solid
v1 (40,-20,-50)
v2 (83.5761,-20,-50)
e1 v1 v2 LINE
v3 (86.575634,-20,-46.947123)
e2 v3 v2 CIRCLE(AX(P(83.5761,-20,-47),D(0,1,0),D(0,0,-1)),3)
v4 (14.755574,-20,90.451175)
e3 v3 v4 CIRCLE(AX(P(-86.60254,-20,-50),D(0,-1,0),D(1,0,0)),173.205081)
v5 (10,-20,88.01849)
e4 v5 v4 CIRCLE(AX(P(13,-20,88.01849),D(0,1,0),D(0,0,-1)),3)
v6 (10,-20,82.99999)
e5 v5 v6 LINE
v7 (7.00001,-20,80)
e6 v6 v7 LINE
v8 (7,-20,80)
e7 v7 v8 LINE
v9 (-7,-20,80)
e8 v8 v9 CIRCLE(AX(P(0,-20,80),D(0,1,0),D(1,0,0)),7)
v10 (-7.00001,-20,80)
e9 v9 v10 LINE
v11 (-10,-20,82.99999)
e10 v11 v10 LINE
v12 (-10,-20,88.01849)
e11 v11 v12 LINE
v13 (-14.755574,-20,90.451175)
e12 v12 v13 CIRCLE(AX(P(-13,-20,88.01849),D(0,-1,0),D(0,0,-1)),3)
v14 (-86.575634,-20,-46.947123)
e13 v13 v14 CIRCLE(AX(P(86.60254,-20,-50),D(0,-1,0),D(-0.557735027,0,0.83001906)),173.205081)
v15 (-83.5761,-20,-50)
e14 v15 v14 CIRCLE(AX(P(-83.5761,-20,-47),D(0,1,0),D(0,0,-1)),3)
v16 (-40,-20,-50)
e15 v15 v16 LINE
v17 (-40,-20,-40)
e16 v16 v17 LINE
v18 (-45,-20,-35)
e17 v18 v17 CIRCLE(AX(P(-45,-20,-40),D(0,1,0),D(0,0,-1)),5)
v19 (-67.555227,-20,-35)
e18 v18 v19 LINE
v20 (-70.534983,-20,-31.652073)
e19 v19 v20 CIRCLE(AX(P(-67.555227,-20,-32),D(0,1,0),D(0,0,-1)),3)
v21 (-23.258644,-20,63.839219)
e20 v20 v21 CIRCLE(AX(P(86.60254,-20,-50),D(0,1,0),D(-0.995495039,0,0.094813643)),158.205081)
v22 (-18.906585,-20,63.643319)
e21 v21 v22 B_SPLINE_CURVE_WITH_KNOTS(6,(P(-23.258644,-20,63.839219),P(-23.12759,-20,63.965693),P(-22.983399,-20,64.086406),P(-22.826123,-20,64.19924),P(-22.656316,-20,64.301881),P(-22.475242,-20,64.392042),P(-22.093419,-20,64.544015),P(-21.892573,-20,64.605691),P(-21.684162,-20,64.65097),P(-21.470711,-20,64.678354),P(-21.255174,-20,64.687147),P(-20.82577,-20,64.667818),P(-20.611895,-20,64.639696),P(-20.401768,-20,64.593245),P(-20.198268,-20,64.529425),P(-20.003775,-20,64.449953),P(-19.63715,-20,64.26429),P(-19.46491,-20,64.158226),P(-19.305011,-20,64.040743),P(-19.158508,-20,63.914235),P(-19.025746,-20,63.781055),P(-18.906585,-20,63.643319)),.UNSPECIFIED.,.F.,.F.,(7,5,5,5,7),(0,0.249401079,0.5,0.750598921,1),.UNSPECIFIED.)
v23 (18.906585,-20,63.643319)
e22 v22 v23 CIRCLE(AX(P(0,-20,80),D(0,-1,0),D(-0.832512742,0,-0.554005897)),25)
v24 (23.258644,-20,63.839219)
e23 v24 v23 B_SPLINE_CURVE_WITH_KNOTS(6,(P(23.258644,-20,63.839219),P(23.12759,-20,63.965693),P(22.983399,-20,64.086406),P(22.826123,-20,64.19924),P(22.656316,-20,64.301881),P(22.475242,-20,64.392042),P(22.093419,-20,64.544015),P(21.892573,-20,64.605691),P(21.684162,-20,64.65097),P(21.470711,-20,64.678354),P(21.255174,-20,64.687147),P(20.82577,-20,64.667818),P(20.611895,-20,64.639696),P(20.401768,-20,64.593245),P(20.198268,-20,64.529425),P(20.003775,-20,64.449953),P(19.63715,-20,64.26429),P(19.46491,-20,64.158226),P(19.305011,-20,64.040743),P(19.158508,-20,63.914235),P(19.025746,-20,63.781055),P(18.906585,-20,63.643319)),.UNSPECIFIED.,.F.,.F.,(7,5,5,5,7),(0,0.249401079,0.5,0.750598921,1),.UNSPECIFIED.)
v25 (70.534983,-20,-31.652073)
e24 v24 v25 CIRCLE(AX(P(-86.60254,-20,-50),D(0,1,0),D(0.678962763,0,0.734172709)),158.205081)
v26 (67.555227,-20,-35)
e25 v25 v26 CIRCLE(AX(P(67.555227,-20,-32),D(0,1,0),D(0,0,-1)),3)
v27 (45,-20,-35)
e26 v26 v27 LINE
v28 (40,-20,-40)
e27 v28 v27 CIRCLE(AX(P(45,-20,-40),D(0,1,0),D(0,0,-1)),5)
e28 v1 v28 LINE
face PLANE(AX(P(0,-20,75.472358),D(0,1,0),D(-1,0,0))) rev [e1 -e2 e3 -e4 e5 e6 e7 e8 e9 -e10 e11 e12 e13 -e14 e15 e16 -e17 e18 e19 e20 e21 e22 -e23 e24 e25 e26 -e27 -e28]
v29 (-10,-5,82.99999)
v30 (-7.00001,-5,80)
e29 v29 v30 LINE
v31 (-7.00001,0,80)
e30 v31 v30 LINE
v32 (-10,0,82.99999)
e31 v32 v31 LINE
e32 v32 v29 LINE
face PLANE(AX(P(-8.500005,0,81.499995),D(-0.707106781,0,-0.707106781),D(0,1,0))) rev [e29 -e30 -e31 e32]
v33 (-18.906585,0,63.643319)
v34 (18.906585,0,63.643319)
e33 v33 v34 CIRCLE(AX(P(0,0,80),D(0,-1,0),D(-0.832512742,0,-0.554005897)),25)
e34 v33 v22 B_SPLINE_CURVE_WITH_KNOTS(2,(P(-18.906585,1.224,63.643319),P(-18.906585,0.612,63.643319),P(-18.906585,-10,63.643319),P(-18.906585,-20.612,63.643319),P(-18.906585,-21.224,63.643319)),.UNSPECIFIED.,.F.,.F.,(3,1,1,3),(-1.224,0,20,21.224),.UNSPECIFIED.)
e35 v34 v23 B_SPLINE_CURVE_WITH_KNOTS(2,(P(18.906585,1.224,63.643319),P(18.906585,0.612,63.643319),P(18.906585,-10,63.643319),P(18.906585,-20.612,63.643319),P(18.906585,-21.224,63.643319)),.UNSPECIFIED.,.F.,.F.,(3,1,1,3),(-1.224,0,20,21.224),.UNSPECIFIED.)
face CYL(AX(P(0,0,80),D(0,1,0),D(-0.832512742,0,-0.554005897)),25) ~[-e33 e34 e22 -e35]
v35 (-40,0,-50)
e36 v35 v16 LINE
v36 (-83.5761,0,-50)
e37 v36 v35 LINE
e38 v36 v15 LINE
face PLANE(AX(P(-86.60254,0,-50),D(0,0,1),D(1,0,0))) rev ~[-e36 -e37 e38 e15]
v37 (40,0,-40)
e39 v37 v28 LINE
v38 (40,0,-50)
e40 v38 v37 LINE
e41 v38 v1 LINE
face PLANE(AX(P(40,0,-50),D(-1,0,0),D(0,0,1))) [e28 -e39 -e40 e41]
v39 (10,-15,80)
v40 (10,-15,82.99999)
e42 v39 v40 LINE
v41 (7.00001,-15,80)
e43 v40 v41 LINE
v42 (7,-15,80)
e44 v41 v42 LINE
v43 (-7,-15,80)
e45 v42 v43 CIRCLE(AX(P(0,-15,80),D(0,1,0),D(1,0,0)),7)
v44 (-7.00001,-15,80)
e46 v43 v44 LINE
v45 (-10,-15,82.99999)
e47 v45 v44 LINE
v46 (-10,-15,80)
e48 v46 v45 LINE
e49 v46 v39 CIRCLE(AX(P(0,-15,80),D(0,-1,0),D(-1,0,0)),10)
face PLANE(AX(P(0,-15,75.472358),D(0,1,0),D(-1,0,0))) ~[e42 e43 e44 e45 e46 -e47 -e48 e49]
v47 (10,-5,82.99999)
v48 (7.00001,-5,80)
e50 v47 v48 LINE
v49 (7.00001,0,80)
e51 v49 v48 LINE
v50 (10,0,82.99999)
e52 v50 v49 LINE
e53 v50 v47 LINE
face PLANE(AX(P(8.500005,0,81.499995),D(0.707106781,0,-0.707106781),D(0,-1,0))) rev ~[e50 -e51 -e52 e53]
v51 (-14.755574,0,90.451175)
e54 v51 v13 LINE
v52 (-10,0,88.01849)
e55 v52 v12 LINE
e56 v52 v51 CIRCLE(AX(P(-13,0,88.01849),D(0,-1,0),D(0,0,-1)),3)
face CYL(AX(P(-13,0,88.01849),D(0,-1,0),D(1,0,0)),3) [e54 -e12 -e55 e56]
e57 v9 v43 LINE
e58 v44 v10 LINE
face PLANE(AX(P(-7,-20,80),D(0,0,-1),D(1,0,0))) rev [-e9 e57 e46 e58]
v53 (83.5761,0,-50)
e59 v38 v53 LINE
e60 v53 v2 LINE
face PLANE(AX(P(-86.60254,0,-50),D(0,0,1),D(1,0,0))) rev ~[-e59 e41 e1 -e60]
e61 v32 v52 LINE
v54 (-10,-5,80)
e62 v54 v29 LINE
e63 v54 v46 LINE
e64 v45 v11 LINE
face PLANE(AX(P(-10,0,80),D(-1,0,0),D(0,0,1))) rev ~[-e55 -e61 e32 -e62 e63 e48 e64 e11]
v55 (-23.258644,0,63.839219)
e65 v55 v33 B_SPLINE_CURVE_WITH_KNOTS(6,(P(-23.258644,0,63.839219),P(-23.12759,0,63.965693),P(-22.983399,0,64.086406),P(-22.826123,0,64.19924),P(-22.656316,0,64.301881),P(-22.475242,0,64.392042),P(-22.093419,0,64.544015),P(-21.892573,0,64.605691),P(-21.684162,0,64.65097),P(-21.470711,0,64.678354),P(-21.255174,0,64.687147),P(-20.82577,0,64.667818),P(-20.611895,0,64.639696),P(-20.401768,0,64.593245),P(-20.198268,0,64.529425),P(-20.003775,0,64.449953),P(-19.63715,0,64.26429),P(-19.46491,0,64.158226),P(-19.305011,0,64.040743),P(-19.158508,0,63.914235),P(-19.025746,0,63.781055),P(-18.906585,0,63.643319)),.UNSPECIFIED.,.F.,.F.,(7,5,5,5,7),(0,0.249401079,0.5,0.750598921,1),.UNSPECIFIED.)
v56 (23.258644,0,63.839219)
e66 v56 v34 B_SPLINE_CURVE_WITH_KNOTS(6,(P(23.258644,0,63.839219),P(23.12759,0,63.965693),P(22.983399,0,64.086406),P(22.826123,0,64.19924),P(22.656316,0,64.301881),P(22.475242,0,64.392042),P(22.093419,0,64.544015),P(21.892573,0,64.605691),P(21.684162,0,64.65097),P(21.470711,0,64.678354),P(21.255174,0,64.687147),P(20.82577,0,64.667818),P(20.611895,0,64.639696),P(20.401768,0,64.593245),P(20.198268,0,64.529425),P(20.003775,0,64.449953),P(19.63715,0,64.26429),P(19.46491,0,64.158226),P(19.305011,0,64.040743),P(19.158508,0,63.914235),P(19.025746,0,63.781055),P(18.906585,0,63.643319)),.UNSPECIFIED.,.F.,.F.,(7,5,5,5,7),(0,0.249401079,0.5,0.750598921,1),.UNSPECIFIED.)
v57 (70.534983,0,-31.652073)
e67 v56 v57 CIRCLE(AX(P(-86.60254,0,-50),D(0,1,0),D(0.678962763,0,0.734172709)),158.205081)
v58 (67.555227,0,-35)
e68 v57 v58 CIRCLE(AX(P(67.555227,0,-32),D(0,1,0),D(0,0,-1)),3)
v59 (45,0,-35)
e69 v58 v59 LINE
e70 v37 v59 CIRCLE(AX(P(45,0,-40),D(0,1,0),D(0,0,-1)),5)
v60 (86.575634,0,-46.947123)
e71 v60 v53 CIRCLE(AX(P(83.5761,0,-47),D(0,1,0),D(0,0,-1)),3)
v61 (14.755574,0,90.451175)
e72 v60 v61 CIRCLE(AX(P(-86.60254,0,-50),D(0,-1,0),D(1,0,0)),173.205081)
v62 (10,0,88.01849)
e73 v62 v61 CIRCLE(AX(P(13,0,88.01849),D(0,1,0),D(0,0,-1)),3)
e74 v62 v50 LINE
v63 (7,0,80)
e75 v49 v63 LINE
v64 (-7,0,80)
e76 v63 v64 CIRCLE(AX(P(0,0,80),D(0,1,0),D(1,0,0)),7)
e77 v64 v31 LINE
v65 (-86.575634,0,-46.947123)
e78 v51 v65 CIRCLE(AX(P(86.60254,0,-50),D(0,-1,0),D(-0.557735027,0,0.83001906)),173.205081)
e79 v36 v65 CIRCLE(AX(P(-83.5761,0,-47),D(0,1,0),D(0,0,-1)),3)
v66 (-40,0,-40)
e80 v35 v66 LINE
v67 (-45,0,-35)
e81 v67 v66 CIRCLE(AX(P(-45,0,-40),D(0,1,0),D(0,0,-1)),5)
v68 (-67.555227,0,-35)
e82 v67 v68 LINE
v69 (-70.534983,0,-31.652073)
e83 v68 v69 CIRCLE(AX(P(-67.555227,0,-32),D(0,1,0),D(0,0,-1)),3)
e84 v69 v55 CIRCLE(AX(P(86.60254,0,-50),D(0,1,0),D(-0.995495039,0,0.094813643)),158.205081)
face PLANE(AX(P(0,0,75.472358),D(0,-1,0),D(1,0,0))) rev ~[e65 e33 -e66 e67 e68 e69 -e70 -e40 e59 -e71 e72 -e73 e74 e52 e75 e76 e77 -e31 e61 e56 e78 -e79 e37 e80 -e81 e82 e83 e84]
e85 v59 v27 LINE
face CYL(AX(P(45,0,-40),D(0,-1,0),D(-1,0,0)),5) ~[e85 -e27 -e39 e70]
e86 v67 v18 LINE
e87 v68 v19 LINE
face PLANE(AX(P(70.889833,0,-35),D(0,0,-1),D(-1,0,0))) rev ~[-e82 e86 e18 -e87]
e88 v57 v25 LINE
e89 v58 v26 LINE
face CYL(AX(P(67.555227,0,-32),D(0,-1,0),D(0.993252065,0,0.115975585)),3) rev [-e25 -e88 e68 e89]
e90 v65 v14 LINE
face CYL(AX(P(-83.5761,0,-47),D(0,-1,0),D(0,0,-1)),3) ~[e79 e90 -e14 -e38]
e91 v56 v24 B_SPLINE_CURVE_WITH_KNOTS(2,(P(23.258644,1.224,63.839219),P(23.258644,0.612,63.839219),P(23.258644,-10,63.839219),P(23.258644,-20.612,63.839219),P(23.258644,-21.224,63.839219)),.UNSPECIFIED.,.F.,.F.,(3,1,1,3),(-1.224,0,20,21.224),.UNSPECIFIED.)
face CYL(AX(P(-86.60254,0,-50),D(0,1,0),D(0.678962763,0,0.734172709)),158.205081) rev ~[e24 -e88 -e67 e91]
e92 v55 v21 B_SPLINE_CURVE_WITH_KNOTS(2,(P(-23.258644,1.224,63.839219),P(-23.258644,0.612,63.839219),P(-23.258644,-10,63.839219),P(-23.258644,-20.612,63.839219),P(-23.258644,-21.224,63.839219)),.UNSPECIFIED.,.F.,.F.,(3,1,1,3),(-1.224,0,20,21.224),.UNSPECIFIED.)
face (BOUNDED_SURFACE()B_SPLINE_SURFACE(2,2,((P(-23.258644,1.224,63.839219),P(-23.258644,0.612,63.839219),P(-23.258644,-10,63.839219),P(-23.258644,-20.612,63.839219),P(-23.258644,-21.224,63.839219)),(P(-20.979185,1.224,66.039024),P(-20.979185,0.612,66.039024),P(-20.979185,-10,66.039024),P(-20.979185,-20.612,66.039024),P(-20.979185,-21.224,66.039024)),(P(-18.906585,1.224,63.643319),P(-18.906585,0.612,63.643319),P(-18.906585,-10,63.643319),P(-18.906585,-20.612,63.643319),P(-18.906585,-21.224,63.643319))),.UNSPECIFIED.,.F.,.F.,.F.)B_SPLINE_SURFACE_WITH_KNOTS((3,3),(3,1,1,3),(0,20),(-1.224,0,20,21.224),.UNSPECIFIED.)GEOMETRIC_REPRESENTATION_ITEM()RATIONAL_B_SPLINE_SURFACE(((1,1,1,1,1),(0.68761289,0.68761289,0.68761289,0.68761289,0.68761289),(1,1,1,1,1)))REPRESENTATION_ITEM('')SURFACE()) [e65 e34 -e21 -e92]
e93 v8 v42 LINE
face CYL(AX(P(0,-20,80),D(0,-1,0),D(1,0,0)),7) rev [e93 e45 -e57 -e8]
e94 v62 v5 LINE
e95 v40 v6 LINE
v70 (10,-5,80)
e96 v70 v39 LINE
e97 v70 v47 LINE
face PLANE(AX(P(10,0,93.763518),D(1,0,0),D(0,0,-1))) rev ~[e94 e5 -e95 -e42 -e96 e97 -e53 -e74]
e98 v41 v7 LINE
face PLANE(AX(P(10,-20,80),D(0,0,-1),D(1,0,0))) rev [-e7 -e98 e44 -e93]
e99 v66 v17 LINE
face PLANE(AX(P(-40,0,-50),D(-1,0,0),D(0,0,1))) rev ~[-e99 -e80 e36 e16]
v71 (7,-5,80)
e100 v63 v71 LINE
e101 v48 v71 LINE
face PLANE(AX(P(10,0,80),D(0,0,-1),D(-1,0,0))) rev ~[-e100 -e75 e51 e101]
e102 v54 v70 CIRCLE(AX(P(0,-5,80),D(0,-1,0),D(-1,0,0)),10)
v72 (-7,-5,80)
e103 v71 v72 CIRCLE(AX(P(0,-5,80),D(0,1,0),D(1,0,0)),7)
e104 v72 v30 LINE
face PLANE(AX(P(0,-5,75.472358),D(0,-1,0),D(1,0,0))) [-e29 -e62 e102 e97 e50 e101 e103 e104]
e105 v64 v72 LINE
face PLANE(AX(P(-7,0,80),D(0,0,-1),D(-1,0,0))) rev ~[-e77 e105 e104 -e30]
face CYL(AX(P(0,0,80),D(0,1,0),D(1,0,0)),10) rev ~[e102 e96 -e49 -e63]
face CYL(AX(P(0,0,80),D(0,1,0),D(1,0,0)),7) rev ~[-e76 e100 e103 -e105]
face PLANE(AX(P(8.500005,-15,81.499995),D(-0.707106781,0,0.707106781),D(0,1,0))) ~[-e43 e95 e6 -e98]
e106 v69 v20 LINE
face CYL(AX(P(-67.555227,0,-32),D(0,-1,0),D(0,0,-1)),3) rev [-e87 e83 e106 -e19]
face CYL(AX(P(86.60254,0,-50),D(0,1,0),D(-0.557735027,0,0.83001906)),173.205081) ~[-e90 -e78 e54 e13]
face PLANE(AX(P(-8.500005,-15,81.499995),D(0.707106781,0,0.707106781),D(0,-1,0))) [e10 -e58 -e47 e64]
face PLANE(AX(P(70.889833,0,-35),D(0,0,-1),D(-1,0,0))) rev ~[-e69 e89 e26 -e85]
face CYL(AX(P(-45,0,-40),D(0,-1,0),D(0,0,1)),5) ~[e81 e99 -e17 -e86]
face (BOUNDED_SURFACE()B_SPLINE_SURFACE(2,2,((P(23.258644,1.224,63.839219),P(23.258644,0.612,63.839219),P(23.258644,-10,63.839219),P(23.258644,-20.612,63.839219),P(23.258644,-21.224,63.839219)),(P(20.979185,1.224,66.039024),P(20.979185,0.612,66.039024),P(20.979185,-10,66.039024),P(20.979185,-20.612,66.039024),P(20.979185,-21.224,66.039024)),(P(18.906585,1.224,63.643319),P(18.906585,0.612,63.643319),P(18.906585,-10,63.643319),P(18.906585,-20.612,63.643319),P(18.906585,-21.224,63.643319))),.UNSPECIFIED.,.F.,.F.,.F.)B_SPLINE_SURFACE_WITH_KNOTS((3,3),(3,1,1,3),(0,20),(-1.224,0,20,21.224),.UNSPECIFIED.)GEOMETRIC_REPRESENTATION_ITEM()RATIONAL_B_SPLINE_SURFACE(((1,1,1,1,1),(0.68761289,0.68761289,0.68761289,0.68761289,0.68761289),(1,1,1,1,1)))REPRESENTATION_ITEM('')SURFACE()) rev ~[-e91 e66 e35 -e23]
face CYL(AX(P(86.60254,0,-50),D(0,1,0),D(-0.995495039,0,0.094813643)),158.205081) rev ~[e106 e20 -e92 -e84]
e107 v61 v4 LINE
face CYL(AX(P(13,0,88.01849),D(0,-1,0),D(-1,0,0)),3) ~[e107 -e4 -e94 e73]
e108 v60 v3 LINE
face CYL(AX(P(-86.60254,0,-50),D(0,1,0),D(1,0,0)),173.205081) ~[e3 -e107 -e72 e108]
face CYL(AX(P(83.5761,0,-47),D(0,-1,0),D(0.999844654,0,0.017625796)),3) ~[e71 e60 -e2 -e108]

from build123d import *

# Parameters (mm, degrees)
F1_DEPTH = 20
F2_DEPTH = 5
F4_R     = 3
F5_SIZE  = 2.99999
F6_W     = 80
F6_H     = 15
F7_DEPTH = 20
F8_R     = 5


# Not quite as in the source:
# - a fillet or chamfer is up to 0.001 mm smaller than in the source, because OpenCascade refuses the exact size
# - a pattern or mirror of a feature is missing from the dataset's text; its kind, count and spacing are read off the source's solid


with BuildPart() as f1:
    # F0 (on Front) → F1 (new body)
    with BuildSketch(Plane.XZ):
        with BuildLine():
            Line((-86.6025403784, -50), (86.6025403784, -50))
            ThreePointArc((86.6025403784, -50), (66.25695525, 31.4492148287), (10, 93.7635182946))
            Line((10, 93.7635182946), (10, 80))
            ThreePointArc((10, 80), (0, 70), (-10, 80))
            Line((-10, 80), (-10, 93.7635182946))
            ThreePointArc((-10, 93.7635182946), (-66.25695525, 31.4492148287), (-86.6025403784, -50))
        make_face()
        with BuildLine():
            ThreePointArc((20.8128184267, 66.1498526475), (55.1784519137, 20.1925765445), (70.8898326981, -35))
            Line((70.8898326981, -35), (-70.8898326981, -35))
            ThreePointArc((-70.8898326981, -35), (-55.1784519137, 20.1925765445), (-20.8128184267, 66.1498526475))
            ThreePointArc((-20.8128184267, 66.1498526475), (0, 55.000000149), (20.8128184267, 66.1498526475))
        make_face(mode=Mode.SUBTRACT)
    extrude(amount=F1_DEPTH)

    # F0 (on Front) → F2 (join)
    with BuildSketch(Plane.XZ):
        with BuildLine():
            ThreePointArc((-10, 80), (0, 70), (10, 80))
            Line((10, 80), (7, 80))
            ThreePointArc((7, 80), (0, 73), (-7, 80))
            Line((-7, 80), (-10, 80))
        make_face()
    f2 = extrude(amount=F2_DEPTH)

    # F2_copies: F2 across plane
    add(f2.mirror(Plane(origin=(0, -10, 0), x_dir=(0, 0, -1), z_dir=(0, -1, 0))))

    # F4
    f4_edges = [f1.edges().sort_by_distance(p)[0] for p in [
        (-10, -10, 93.763518),
        (10, -10, 93.763518),
        (86.60254, -10, -50),
        (-86.60254, -10, -50),
        (-70.889833, -10, -35),
        (70.889833, -10, -35),
        (20.812818, -10, 66.149853),
        (-20.812818, -10, 66.149853),
    ]]
    fillet(f4_edges, radius=F4_R)

    # F5 (size 3 in the source; OpenCascade refuses exactly that, so slightly less here)
    f5_edges = [f1.edges().sort_by_distance(p)[0] for p in [
        (-10, -2.5, 80),
        (-10, -10, 80),
        (-10, -17.5, 80),
        (10, -2.5, 80),
        (10, -10, 80),
        (10, -17.5, 80),
    ]]
    chamfer(f5_edges, length=F5_SIZE)

    # F6 (on face) → F7 (cut, through all)
    with BuildSketch(Plane(origin=(0, 0, 0), x_dir=(-1, 0, 0), z_dir=(0, 1, 0))):
        with Locations((0, -42.5)):
            Rectangle(F6_W, F6_H)
    extrude(amount=-F7_DEPTH, mode=Mode.SUBTRACT)

    # F8
    f8_edges = [f1.edges().sort_by_distance(p)[0] for p in [
        (40, -10, -35),
        (-40, -10, -35),
    ]]
    fillet(f8_edges, radius=F8_R)


solid = f1.part
